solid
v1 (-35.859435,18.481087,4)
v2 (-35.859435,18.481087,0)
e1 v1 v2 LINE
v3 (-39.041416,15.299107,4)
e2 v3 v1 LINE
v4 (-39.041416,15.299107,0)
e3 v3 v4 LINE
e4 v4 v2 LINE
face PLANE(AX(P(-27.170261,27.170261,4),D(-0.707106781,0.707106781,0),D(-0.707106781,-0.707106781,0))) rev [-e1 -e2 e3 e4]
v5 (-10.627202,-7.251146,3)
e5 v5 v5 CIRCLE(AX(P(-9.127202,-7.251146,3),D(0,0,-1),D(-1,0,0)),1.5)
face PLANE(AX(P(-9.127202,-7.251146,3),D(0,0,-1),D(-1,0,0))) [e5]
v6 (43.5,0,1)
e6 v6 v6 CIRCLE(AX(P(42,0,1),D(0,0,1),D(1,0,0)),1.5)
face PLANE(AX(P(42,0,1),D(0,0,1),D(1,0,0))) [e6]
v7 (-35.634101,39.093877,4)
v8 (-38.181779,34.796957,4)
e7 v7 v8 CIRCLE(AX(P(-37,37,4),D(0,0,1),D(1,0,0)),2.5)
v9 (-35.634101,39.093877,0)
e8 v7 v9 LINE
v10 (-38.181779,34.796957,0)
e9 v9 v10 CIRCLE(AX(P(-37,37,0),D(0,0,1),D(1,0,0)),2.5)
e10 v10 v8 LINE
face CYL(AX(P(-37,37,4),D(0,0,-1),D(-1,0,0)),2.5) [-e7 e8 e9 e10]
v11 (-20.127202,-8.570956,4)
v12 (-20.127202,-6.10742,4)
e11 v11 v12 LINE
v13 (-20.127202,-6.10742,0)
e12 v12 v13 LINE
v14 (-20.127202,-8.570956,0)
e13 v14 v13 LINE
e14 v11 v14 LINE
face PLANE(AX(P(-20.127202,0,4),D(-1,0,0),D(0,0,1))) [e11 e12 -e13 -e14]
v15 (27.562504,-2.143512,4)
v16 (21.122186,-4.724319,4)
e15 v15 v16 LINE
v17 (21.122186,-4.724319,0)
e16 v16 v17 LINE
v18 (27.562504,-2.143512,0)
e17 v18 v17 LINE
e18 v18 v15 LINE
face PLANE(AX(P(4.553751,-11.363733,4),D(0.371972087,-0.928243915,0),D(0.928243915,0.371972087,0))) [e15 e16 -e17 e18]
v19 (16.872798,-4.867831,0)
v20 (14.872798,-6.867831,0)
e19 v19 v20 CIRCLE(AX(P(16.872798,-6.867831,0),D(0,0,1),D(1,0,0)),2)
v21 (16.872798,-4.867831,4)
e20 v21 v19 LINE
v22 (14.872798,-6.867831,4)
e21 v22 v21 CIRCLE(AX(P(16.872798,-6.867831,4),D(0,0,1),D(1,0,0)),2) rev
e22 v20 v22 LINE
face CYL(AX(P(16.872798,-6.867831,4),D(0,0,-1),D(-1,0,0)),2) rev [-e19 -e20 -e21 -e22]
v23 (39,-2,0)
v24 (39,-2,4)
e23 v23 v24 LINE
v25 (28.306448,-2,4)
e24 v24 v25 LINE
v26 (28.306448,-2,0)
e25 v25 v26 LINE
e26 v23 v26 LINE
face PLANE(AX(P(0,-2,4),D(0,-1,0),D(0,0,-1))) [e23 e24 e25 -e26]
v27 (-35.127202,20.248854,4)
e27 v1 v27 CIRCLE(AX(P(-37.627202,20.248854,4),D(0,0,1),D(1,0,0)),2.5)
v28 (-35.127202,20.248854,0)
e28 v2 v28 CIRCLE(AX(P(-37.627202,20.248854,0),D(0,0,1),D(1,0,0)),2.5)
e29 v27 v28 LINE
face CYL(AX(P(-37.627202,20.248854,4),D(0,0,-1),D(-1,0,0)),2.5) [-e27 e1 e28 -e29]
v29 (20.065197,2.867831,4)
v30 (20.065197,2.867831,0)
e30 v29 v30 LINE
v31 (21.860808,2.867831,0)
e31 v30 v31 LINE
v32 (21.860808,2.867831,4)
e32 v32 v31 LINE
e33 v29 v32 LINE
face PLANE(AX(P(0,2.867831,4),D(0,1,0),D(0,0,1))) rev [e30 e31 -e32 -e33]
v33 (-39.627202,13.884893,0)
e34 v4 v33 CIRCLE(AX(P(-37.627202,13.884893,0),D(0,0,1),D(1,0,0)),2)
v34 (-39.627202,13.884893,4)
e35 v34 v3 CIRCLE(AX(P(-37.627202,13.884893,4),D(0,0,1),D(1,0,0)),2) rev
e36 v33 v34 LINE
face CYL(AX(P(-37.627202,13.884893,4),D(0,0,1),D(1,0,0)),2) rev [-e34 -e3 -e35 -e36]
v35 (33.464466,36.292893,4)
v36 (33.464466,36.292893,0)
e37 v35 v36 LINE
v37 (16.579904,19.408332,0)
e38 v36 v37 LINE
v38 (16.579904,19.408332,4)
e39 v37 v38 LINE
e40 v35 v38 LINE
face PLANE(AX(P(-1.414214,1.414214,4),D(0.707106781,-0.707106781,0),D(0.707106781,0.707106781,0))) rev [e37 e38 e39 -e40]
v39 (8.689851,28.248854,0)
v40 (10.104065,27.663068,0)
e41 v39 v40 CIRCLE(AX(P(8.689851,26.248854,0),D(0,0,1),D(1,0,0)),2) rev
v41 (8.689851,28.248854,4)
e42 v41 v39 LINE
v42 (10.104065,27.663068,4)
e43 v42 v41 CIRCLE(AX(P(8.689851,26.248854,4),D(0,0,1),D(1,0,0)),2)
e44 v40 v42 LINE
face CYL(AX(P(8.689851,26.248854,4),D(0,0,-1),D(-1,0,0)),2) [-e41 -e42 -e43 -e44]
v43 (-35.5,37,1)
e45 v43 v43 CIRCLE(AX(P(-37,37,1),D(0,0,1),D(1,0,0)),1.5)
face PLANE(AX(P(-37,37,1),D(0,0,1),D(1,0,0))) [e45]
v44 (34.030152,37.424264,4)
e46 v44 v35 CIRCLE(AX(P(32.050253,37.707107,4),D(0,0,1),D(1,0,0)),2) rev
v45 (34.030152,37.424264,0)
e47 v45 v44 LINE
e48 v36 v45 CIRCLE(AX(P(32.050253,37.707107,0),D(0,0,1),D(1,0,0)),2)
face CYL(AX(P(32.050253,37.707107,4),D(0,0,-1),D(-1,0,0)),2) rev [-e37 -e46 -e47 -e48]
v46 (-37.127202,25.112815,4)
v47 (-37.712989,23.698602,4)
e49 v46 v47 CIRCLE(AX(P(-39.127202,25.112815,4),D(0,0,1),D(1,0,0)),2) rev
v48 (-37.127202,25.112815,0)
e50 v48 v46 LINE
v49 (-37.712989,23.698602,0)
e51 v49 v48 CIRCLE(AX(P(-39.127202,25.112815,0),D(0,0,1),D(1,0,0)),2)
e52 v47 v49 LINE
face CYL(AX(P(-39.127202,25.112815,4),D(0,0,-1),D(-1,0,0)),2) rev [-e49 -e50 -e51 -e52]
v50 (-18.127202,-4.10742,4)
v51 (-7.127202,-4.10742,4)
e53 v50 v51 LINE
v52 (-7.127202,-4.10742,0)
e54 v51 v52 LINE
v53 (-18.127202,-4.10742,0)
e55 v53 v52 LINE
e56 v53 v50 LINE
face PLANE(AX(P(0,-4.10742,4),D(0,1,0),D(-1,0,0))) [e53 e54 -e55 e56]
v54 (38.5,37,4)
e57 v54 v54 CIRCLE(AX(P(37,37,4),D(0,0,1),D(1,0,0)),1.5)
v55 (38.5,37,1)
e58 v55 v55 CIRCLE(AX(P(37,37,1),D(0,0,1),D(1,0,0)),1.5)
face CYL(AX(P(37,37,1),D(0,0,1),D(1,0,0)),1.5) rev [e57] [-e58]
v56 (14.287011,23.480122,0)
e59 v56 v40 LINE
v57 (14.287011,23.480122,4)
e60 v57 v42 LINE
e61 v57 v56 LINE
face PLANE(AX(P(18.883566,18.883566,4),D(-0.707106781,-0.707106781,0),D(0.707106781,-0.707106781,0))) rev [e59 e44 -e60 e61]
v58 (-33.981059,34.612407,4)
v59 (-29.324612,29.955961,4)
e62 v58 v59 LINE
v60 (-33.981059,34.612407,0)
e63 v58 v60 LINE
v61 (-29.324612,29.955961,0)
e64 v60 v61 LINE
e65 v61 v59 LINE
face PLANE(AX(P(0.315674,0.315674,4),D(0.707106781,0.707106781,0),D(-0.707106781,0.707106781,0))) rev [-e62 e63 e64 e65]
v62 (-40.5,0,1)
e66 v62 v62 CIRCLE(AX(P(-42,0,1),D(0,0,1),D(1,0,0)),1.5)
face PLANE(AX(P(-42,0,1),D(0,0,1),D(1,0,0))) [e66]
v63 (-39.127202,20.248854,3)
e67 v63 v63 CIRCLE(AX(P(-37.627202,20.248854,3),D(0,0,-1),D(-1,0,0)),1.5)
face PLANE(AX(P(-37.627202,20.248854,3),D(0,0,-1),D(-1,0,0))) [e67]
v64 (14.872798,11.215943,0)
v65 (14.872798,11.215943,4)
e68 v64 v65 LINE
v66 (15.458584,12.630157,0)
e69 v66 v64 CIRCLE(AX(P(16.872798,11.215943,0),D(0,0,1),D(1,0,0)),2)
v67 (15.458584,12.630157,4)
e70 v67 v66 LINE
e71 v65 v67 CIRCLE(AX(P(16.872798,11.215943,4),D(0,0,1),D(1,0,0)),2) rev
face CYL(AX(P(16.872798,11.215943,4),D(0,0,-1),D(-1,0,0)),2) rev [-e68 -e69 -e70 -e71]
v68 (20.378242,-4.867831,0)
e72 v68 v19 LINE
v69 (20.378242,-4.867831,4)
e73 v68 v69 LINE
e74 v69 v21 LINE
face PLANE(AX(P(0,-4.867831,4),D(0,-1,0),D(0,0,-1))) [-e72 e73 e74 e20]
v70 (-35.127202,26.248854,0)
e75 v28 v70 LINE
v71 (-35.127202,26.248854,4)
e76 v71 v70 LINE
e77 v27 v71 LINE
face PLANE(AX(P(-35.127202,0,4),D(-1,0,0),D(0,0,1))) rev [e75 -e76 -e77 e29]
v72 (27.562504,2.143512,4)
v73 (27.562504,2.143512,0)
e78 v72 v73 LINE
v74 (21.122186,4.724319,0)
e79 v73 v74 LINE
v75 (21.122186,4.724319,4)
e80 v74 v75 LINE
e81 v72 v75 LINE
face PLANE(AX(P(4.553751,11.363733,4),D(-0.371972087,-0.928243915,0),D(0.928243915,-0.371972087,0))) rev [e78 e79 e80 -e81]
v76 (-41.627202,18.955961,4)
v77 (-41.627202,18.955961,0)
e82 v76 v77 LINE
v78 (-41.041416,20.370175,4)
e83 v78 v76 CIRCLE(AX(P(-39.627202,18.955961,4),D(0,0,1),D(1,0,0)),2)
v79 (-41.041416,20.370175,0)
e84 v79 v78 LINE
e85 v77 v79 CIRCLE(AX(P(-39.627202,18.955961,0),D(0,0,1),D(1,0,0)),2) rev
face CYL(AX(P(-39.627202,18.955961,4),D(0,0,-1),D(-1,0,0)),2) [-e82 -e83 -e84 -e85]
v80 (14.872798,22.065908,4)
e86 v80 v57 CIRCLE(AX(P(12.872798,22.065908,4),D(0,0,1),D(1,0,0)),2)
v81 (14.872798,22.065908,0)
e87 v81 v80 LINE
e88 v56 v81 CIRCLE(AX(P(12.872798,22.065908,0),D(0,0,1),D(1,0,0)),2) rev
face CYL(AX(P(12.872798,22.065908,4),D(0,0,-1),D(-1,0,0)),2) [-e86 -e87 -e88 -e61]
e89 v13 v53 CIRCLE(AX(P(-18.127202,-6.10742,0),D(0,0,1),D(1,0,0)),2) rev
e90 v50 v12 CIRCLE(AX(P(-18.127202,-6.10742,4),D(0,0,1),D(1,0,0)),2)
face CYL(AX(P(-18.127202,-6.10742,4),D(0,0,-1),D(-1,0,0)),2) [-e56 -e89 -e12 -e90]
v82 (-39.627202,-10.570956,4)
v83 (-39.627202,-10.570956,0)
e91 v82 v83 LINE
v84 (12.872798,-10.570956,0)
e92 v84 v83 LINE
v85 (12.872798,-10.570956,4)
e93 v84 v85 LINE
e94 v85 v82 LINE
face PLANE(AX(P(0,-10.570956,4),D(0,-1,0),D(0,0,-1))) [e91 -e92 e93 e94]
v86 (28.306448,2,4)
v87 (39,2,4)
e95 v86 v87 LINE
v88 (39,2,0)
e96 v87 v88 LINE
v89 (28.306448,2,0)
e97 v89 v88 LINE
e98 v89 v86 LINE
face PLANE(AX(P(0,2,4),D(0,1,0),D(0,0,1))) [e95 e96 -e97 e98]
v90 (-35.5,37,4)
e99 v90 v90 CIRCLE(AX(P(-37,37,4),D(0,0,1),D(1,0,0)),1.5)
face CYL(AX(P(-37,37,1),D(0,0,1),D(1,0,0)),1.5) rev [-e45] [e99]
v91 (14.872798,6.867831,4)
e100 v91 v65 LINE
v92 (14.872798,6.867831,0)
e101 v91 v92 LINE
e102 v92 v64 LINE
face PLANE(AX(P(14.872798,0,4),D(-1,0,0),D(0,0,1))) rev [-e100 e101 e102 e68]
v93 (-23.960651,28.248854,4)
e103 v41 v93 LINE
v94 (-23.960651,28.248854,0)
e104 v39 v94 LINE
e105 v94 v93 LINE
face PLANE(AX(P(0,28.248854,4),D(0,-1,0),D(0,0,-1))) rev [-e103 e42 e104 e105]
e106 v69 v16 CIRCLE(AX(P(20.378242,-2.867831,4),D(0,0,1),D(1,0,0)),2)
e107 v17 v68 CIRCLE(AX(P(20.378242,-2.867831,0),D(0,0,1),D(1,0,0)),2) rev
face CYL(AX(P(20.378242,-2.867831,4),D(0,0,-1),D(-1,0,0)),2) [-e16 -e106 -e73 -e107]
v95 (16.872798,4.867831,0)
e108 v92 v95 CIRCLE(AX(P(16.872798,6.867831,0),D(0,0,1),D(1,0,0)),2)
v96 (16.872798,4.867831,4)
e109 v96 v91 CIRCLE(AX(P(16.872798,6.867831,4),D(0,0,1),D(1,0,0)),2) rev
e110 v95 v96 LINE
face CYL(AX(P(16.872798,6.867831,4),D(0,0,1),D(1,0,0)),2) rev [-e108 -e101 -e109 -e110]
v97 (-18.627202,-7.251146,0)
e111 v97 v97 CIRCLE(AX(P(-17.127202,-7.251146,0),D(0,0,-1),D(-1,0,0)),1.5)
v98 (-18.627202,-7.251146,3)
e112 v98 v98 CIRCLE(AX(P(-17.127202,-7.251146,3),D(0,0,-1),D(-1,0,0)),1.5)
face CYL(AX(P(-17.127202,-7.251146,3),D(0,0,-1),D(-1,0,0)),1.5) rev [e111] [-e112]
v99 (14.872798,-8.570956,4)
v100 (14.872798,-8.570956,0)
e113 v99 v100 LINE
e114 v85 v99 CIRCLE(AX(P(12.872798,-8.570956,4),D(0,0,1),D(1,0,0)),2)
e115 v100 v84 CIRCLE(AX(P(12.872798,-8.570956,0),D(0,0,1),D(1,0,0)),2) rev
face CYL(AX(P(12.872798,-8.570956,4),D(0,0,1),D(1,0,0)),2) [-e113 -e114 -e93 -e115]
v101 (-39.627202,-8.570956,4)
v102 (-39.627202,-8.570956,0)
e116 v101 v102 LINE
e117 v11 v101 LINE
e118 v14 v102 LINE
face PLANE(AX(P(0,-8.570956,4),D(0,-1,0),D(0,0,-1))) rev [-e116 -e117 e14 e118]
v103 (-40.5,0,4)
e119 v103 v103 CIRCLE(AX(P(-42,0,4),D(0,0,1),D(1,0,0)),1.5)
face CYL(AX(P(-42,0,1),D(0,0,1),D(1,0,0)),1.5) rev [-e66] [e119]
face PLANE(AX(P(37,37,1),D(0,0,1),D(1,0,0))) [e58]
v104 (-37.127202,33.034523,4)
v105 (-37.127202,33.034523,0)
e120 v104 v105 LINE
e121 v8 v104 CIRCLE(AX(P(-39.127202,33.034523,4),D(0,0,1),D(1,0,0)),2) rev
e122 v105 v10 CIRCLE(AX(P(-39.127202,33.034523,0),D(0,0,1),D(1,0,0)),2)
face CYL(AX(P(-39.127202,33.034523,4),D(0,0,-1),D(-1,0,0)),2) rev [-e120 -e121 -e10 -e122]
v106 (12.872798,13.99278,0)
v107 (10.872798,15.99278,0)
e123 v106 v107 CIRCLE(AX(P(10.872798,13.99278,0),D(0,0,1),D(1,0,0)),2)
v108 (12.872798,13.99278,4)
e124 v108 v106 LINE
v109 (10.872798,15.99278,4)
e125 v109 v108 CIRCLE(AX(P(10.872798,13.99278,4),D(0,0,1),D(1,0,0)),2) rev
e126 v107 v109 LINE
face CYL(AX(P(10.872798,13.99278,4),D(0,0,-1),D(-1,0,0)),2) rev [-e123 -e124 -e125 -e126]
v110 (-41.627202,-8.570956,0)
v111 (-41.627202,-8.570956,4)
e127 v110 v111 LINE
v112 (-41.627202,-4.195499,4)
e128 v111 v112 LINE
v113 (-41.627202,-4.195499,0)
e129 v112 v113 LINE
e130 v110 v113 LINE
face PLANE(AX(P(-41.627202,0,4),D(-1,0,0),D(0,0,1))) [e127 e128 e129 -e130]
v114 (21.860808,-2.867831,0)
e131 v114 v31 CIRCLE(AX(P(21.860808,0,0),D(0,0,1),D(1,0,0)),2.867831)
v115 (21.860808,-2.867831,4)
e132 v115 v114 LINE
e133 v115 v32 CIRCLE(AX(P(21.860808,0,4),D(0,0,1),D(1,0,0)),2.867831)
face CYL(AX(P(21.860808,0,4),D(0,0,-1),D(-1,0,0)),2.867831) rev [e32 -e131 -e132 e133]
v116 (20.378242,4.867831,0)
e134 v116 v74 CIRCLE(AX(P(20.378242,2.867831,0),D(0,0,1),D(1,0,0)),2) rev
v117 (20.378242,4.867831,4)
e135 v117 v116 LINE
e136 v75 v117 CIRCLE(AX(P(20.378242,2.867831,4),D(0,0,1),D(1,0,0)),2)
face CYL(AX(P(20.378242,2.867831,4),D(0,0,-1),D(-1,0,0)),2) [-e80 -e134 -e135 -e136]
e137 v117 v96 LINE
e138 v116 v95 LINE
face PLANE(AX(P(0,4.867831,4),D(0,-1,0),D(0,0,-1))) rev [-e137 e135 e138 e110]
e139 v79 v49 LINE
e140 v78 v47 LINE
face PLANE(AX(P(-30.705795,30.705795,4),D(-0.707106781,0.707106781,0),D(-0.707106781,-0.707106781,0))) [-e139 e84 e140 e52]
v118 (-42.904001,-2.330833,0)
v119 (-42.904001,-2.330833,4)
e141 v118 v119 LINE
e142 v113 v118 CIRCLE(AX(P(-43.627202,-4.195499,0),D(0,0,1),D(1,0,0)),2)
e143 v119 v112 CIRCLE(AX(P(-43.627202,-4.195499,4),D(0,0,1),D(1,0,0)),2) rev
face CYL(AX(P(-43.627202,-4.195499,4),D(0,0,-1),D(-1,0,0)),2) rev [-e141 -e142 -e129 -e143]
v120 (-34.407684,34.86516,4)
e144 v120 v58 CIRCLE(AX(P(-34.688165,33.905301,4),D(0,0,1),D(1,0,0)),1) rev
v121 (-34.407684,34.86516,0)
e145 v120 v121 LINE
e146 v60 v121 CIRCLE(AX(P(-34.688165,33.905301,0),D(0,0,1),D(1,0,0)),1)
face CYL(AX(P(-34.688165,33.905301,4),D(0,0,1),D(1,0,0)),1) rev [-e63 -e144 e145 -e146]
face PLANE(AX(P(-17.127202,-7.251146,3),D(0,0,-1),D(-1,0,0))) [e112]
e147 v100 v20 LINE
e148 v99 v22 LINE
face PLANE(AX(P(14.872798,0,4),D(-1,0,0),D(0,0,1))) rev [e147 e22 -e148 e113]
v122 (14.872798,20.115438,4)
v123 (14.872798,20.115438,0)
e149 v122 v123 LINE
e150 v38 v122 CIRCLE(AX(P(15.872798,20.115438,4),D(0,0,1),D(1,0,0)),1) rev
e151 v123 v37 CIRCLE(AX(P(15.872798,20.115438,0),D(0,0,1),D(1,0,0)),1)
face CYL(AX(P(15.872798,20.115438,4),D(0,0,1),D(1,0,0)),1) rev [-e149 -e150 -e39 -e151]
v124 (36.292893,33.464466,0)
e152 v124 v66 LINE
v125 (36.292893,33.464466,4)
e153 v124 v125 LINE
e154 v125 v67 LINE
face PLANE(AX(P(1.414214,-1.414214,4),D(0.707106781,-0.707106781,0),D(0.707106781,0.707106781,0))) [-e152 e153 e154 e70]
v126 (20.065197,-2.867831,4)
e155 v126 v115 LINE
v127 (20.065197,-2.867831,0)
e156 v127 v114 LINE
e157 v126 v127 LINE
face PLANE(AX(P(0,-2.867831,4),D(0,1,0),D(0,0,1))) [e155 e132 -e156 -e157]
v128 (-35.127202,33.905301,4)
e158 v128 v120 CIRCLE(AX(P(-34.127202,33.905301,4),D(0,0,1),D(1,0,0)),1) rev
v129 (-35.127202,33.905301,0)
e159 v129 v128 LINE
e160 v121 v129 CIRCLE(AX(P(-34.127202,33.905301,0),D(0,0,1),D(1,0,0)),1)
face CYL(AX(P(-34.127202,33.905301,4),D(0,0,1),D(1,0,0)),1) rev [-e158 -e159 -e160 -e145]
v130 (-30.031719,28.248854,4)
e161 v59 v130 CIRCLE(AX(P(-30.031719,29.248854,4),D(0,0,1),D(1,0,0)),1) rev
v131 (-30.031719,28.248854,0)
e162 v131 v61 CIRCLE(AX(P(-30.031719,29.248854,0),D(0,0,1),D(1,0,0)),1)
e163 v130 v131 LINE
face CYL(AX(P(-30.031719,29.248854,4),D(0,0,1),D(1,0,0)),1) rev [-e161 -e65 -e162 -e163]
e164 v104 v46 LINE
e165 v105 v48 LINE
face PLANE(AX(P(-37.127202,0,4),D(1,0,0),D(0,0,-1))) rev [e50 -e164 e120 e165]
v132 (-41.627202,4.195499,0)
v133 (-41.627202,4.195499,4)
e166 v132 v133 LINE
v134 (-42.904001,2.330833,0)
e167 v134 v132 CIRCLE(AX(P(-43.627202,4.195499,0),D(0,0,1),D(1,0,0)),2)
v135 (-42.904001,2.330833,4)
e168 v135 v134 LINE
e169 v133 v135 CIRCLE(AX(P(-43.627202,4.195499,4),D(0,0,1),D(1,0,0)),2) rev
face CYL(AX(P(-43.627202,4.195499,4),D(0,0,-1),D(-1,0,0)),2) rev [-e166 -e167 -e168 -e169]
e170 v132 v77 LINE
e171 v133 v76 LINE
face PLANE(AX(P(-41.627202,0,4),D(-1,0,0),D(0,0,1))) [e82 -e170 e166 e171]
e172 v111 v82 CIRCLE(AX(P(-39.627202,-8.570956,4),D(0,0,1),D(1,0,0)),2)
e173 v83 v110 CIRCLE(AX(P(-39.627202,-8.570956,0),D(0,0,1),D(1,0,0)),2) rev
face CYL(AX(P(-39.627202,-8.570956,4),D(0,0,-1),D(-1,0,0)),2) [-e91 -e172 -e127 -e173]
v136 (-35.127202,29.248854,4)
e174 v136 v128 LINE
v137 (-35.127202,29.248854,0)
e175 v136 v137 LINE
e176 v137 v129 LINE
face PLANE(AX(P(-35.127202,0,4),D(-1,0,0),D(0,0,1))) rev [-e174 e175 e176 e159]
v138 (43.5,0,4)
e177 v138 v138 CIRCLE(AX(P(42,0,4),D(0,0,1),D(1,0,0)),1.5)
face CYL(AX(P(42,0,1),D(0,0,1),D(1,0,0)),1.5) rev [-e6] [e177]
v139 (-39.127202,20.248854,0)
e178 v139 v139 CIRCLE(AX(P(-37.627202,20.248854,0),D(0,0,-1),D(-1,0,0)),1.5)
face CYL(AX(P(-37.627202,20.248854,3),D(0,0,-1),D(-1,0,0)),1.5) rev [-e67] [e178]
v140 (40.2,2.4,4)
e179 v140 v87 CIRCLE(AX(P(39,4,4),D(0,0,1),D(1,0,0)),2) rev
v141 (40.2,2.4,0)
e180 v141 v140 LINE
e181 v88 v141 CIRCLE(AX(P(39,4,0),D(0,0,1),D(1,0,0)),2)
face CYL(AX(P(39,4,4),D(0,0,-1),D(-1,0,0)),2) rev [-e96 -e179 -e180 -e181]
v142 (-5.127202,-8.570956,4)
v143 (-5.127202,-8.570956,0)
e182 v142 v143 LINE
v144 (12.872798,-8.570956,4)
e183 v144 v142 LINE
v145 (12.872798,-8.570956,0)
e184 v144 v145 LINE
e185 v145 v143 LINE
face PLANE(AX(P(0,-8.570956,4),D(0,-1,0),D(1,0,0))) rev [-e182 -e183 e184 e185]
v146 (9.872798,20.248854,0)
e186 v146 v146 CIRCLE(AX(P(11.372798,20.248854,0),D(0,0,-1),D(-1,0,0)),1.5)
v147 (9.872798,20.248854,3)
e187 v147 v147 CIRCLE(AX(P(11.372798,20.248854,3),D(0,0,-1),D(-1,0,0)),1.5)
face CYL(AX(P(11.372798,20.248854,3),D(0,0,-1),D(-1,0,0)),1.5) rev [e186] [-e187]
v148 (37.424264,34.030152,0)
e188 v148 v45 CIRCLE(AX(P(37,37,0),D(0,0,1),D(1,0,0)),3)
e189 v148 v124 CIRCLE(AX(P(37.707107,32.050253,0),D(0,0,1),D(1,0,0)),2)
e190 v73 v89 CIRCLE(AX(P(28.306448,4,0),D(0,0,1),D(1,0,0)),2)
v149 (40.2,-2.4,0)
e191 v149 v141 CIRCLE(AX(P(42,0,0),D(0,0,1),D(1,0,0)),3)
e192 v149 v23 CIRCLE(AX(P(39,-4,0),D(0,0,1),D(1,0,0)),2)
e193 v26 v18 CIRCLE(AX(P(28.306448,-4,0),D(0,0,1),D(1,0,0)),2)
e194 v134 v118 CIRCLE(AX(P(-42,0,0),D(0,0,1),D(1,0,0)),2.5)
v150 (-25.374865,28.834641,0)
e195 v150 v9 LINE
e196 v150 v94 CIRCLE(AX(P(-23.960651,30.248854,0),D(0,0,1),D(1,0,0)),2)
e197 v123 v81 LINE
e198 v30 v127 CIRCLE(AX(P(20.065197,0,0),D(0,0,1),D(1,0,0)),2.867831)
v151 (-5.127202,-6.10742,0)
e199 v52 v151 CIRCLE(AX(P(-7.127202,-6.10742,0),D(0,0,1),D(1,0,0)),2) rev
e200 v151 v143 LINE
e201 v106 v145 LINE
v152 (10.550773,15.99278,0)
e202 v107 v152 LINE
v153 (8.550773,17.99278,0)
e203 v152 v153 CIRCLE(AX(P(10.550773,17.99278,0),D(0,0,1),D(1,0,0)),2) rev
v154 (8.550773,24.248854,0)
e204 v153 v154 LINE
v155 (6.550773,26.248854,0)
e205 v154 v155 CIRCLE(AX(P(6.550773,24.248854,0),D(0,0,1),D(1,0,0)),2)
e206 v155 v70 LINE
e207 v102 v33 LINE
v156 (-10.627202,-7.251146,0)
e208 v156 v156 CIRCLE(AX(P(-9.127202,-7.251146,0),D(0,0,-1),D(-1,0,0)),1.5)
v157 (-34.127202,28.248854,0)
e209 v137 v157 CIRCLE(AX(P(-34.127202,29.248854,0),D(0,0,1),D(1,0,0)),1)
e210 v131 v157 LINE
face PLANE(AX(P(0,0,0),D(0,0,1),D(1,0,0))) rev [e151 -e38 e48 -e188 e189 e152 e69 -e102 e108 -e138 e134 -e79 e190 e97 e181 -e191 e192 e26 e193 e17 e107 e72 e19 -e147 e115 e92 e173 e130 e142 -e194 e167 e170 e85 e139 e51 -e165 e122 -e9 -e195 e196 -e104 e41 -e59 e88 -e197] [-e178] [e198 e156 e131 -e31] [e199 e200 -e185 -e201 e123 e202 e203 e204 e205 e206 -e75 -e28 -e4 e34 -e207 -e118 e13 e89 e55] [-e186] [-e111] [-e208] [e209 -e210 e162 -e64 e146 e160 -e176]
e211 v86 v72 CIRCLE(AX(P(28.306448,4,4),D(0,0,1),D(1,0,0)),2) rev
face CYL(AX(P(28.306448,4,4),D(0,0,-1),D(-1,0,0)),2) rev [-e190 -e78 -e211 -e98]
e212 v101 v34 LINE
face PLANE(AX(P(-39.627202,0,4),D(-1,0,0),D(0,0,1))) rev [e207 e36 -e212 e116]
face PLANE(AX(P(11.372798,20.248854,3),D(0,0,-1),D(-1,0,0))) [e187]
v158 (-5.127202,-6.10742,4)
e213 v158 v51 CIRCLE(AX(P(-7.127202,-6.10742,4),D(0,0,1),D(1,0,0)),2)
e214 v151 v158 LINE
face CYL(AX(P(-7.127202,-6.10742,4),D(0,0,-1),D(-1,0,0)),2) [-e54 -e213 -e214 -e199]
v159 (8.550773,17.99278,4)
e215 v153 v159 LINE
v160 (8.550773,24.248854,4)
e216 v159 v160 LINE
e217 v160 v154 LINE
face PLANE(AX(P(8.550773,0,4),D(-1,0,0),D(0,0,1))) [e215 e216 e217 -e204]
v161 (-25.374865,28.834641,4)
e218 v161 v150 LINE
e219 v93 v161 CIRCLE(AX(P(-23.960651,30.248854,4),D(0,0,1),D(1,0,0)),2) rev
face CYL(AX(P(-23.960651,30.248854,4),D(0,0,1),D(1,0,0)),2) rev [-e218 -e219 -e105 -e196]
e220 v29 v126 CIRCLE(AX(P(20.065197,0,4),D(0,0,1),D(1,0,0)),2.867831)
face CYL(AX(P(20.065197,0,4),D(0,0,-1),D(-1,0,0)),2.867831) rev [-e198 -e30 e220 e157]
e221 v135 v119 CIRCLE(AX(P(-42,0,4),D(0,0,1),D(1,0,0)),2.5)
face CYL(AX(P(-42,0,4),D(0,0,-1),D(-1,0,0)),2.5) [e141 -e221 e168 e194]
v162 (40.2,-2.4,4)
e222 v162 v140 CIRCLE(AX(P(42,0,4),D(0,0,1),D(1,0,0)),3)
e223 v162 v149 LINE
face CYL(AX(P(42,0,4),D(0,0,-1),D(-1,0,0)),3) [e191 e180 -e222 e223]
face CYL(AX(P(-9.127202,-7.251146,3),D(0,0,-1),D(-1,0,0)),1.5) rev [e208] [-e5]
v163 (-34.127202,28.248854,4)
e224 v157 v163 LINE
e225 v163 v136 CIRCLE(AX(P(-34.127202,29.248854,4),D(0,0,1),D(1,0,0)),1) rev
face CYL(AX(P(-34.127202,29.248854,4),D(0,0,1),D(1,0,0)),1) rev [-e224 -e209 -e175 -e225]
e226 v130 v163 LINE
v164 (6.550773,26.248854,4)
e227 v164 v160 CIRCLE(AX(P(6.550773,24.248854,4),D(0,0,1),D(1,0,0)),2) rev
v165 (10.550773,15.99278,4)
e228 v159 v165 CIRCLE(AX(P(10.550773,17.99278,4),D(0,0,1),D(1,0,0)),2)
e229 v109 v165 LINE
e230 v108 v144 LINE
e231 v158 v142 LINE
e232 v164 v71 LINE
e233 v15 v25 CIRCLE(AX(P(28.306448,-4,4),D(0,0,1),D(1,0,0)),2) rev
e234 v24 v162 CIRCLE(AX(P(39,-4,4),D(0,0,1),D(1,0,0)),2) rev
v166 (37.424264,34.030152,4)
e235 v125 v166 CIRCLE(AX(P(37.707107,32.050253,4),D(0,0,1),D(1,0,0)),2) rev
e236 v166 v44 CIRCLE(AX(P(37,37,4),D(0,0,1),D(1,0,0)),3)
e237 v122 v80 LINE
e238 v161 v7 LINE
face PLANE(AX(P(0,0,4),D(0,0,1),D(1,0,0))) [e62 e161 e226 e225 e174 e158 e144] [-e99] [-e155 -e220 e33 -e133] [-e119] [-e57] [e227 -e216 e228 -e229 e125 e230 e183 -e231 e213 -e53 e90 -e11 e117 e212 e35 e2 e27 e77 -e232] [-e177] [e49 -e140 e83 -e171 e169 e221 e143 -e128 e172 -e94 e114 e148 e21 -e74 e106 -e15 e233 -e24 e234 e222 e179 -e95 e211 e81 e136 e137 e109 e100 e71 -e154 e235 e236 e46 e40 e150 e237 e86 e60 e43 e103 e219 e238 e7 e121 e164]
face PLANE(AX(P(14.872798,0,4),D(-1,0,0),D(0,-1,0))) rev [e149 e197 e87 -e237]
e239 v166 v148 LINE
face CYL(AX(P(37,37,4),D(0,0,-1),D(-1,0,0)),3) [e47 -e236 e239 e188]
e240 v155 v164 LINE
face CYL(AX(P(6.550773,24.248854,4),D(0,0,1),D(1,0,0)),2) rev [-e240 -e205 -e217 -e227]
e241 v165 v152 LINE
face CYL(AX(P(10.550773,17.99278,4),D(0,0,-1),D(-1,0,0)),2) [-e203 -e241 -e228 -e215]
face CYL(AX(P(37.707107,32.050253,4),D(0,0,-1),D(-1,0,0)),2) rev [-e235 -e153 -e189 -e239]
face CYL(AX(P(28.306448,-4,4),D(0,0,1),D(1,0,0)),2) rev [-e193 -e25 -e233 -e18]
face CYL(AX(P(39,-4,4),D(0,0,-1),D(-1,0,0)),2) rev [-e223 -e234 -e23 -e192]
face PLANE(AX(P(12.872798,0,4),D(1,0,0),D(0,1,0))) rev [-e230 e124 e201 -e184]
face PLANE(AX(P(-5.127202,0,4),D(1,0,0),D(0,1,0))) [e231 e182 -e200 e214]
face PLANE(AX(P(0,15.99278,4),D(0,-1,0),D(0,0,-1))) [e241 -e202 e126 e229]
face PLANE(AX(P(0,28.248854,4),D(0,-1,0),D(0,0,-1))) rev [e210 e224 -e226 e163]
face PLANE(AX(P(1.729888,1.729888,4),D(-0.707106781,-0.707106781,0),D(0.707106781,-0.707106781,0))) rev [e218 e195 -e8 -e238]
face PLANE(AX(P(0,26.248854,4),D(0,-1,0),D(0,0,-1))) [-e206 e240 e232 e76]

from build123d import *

# Parameters (mm, degrees)
BOSS_EXTRUDE1_DEPTH = 4
SKETCH5_R           = 1.5
CUT_EXTRUDE1_DEPTH  = 3
SKETCH6_R           = 1.5
CUT_EXTRUDE2_DEPTH  = 3
FILLET1_R           = 2
FILLET2_R           = 1


with BuildPart() as part:
    # Sketch4 → Boss-Extrude1 (new body)
    with BuildSketch(Plane(origin=(0, 0, 0), x_dir=(0, 1, 0), z_dir=(0, 0, 1))):
        with BuildLine():
            Line((-2, -27.920633468), (-2, -39.763932023))
            ThreePointArc((-2, -39.763932023), (0, -45), (2, -39.763932023))
            Line((2, -39.763932023), (2, -27.920633468))
            Line((2, -27.920633468), (4.867831403, -20.764056013))
            Line((4.867831403, -20.764056013), (4.867831403, -14.872797682))
            Line((4.867831403, -14.872797682), (12.044370558, -14.872797682))
            Line((12.044370558, -14.872797682), (34.004647608, -36.833074732))
            ThreePointArc((34.004647608, -36.833074732), (39.121320344, -39.121320344), (36.833074732, -34.004647608))
            Line((36.833074732, -34.004647608), (17.701224807, -14.872797682))
            Line((17.701224807, -14.872797682), (22.894335258, -14.872797682))
            Line((22.894335258, -14.872797682), (28.248854336, -9.518278604))
            Line((28.248854336, -9.518278604), (28.248854336, 24.78907846))
            Line((28.248854336, 24.78907846), (38.365899309, 34.906123433))
            Line((38.365899309, 34.906123433), (39.093876567, 35.634100691))
            ThreePointArc((39.093876567, 35.634100691), (37.77325109, 39.377410935), (34.503238183, 37.127202318))
            Line((34.503238183, 37.127202318), (24.284388241, 37.127202318))
            Line((24.284388241, 37.127202318), (19.784388241, 41.627202318))
            Line((19.784388241, 41.627202318), (2.472048116, 41.627202318))
            ThreePointArc((2.472048116, 41.627202318), (0, 44.5), (-2.472048116, 41.627202318))
            Line((-2.472048116, 41.627202318), (-10.570956119, 41.627202318))
            Line((-10.570956119, 41.627202318), (-10.570956119, -14.872797682))
            Line((-10.570956119, -14.872797682), (-4.867831403, -14.872797682))
            Line((-4.867831403, -14.872797682), (-4.867831403, -20.764056013))
            Line((-4.867831403, -20.764056013), (-2, -27.920633468))
        make_face()
        with BuildLine():
            ThreePointArc((-2.867831403, -20.065196532), (0, -17.197365128), (2.867831403, -20.065196532))
            Line((2.867831403, -20.065196532), (2.867831403, -21.860808403))
            ThreePointArc((2.867831403, -21.860808403), (0, -24.728639806), (-2.867831403, -21.860808403))
            Line((-2.867831403, -21.860808403), (-2.867831403, -20.065196532))
        make_face(mode=Mode.SUBTRACT)
        with BuildLine():
            Line((15.992780239, -12.872797682), (-8.570956119, -12.872797682))
            Line((-8.570956119, -12.872797682), (-8.570956119, 5.127202318))
            Line((-8.570956119, 5.127202318), (-4.107420483, 5.127202318))
            Line((-4.107420483, 5.127202318), (-4.107420483, 20.127202318))
            Line((-4.107420483, 20.127202318), (-8.570956119, 20.127202318))
            Line((-8.570956119, 20.127202318), (-8.570956119, 39.627202318))
            Line((-8.570956119, 39.627202318), (14.71332043, 39.627202318))
            Line((14.71332043, 39.627202318), (18.481087383, 35.859435365))
            ThreePointArc((18.481087383, 35.859435365), (19.292145755, 35.317503486), (20.248854336, 35.127202318))
            Line((20.248854336, 35.127202318), (26.248854336, 35.127202318))
            Line((26.248854336, 35.127202318), (26.248854336, -4.702478507))
            Line((26.248854336, -4.702478507), (26.248854336, -8.550773098))
            Line((26.248854336, -8.550773098), (15.992780239, -8.550773098))
            Line((15.992780239, -8.550773098), (15.992780239, -12.872797682))
        make_face(mode=Mode.SUBTRACT)
        Polygon((34.905300686, 34.273951935), (28.248854336, 27.617505584), (28.248854336, 35.127202318), (34.905300686, 35.127202318), align=None, mode=Mode.SUBTRACT)
    extrude(amount=BOSS_EXTRUDE1_DEPTH)

    # Sketch5 → Cut-Extrude1 (cut)
    with BuildSketch(Plane.XY.offset(4)):
        with Locations((-37, 37)):
            Circle(SKETCH5_R)
        with Locations((-42, 0)):
            Circle(SKETCH5_R)
        with Locations((37, 37)):
            Circle(SKETCH5_R)
        with Locations((42, 0)):
            Circle(SKETCH5_R)
    extrude(amount=-CUT_EXTRUDE1_DEPTH, mode=Mode.SUBTRACT)

    # Sketch6 → Cut-Extrude2 (cut)
    with BuildSketch(Plane(origin=(0, 0, 0), x_dir=(1, 0, 0), z_dir=(0, 0, -1))):
        with Locations(Location((-17.127202318, 7.251145664, 0), (0, 0, 180))):
            Circle(SKETCH6_R)
        with Locations(Location((-9.127202318, 7.251145664, 0), (0, 0, 180))):
            Circle(SKETCH6_R)
        with Locations(Location((11.372797682, -20.248854336, 0), (0, 0, 180))):
            Circle(SKETCH6_R)
        with Locations(Location((-37.627202318, -20.248854336, 0), (0, 0, 180))):
            Circle(SKETCH6_R)
    extrude(amount=-CUT_EXTRUDE2_DEPTH, mode=Mode.SUBTRACT)

    # Fillet1
    fillet1_edges = [part.edges().sort_by_distance(p)[0] for p in [
        (-41.627202318, 19.784388241, 2),
        (-37.127202318, 24.284388241, 2),
        (-37.127202318, 34.503238183, 2),
        (-24.78907846, 28.248854336, 2),
        (9.518278604, 28.248854336, 2),
        (14.872797682, 22.894335258, 2),
        (34.004647608, 36.833074732, 2),
        (36.833074732, 34.004647608, 2),
        (14.872797682, 12.044370558, 2),
        (14.872797682, 4.867831403, 2),
        (20.764056013, 4.867831403, 2),
        (27.920633468, 2, 2),
        (39.763932023, 2, 2),
        (39.763932023, -2, 2),
        (27.920633468, -2, 2),
        (20.764056013, -4.867831403, 2),
        (14.872797682, -4.867831403, 2),
        (14.872797682, -10.570956119, 2),
        (-41.627202318, -10.570956119, 2),
        (-41.627202318, -2.472048116, 2),
        (-41.627202318, 2.472048116, 2),
        (-39.627202318, 14.71332043, 2),
        (-20.127202318, -4.107420483, 2),
        (-5.127202318, -4.107420483, 2),
        (12.872797682, 15.992780239, 2),
        (8.550773098, 15.992780239, 2),
        (8.550773098, 26.248854336, 2),
    ]]
    fillet(fillet1_edges, radius=FILLET1_R)

    # Fillet2
    # the kernel refuses this fillet: 1 mm, written as the material it adds along each edge
    with BuildSketch(Plane(origin=(14.872797682, 17.701224807, 0), x_dir=(0, 1, 0), z_dir=(0, 0, 1))) as fillet2_piece_1:
        with BuildLine():
            CenterArc((FILLET2_R * 2.41421356237, -FILLET2_R), FILLET2_R, 90, 135)
            Line((FILLET2_R * 1.70710678119, -FILLET2_R * 1.70710678119), (0, 0))
            Line((0, 0), (FILLET2_R * 2.41421356237, 0))
        make_face()
    extrude(amount=4)
    with BuildSketch(Plane(origin=(-34.273951935, 34.905300686, 0), x_dir=(0.7071067811865476, -0.7071067811865476, 0), z_dir=(0, 0, 1))) as fillet2_piece_2:
        with BuildLine():
            CenterArc((FILLET2_R * 0.414213562373, -FILLET2_R), FILLET2_R, 90, 45)
            Line((-FILLET2_R * 0.292893218813, -FILLET2_R * 0.292893218814), (0, 0))
            Line((0, 0), (FILLET2_R * 0.414213562373, 0))
        make_face()
    extrude(amount=4)
    with BuildSketch(Plane(origin=(-35.127202318, 34.905300686, 0), x_dir=(1, 0, 0), z_dir=(0, 0, 1))) as fillet2_piece_3:
        with BuildLine():
            CenterArc((FILLET2_R, -FILLET2_R), FILLET2_R, 90, 90)
            Line((0, -FILLET2_R), (0, 0))
            Line((0, 0), (FILLET2_R, 0))
        make_face()
    extrude(amount=4)
    with BuildSketch(Plane(origin=(-35.127202318, 28.248854336, 0), x_dir=(1, 0, 0), z_dir=(0, 0, 1))) as fillet2_piece_4:
        with BuildLine():
            CenterArc((FILLET2_R, FILLET2_R), FILLET2_R, 180, 90)
            Line((0, FILLET2_R), (0, 0))
            Line((0, 0), (FILLET2_R, 0))
        make_face()
    extrude(amount=4)
    with BuildSketch(Plane(origin=(-27.617505584, 28.248854336, 0), x_dir=(-0.7071067811865468, 0.7071067811865482, 0), z_dir=(0, 0, 1))) as fillet2_piece_5:
        with BuildLine():
            CenterArc((FILLET2_R * 2.41421356237, FILLET2_R), FILLET2_R, 135, 135)
            Line((FILLET2_R * 1.70710678119, FILLET2_R * 1.70710678119), (0, 0))
            Line((0, 0), (FILLET2_R * 2.41421356237, 0))
        make_face()
    extrude(amount=4)


solid = part.part
